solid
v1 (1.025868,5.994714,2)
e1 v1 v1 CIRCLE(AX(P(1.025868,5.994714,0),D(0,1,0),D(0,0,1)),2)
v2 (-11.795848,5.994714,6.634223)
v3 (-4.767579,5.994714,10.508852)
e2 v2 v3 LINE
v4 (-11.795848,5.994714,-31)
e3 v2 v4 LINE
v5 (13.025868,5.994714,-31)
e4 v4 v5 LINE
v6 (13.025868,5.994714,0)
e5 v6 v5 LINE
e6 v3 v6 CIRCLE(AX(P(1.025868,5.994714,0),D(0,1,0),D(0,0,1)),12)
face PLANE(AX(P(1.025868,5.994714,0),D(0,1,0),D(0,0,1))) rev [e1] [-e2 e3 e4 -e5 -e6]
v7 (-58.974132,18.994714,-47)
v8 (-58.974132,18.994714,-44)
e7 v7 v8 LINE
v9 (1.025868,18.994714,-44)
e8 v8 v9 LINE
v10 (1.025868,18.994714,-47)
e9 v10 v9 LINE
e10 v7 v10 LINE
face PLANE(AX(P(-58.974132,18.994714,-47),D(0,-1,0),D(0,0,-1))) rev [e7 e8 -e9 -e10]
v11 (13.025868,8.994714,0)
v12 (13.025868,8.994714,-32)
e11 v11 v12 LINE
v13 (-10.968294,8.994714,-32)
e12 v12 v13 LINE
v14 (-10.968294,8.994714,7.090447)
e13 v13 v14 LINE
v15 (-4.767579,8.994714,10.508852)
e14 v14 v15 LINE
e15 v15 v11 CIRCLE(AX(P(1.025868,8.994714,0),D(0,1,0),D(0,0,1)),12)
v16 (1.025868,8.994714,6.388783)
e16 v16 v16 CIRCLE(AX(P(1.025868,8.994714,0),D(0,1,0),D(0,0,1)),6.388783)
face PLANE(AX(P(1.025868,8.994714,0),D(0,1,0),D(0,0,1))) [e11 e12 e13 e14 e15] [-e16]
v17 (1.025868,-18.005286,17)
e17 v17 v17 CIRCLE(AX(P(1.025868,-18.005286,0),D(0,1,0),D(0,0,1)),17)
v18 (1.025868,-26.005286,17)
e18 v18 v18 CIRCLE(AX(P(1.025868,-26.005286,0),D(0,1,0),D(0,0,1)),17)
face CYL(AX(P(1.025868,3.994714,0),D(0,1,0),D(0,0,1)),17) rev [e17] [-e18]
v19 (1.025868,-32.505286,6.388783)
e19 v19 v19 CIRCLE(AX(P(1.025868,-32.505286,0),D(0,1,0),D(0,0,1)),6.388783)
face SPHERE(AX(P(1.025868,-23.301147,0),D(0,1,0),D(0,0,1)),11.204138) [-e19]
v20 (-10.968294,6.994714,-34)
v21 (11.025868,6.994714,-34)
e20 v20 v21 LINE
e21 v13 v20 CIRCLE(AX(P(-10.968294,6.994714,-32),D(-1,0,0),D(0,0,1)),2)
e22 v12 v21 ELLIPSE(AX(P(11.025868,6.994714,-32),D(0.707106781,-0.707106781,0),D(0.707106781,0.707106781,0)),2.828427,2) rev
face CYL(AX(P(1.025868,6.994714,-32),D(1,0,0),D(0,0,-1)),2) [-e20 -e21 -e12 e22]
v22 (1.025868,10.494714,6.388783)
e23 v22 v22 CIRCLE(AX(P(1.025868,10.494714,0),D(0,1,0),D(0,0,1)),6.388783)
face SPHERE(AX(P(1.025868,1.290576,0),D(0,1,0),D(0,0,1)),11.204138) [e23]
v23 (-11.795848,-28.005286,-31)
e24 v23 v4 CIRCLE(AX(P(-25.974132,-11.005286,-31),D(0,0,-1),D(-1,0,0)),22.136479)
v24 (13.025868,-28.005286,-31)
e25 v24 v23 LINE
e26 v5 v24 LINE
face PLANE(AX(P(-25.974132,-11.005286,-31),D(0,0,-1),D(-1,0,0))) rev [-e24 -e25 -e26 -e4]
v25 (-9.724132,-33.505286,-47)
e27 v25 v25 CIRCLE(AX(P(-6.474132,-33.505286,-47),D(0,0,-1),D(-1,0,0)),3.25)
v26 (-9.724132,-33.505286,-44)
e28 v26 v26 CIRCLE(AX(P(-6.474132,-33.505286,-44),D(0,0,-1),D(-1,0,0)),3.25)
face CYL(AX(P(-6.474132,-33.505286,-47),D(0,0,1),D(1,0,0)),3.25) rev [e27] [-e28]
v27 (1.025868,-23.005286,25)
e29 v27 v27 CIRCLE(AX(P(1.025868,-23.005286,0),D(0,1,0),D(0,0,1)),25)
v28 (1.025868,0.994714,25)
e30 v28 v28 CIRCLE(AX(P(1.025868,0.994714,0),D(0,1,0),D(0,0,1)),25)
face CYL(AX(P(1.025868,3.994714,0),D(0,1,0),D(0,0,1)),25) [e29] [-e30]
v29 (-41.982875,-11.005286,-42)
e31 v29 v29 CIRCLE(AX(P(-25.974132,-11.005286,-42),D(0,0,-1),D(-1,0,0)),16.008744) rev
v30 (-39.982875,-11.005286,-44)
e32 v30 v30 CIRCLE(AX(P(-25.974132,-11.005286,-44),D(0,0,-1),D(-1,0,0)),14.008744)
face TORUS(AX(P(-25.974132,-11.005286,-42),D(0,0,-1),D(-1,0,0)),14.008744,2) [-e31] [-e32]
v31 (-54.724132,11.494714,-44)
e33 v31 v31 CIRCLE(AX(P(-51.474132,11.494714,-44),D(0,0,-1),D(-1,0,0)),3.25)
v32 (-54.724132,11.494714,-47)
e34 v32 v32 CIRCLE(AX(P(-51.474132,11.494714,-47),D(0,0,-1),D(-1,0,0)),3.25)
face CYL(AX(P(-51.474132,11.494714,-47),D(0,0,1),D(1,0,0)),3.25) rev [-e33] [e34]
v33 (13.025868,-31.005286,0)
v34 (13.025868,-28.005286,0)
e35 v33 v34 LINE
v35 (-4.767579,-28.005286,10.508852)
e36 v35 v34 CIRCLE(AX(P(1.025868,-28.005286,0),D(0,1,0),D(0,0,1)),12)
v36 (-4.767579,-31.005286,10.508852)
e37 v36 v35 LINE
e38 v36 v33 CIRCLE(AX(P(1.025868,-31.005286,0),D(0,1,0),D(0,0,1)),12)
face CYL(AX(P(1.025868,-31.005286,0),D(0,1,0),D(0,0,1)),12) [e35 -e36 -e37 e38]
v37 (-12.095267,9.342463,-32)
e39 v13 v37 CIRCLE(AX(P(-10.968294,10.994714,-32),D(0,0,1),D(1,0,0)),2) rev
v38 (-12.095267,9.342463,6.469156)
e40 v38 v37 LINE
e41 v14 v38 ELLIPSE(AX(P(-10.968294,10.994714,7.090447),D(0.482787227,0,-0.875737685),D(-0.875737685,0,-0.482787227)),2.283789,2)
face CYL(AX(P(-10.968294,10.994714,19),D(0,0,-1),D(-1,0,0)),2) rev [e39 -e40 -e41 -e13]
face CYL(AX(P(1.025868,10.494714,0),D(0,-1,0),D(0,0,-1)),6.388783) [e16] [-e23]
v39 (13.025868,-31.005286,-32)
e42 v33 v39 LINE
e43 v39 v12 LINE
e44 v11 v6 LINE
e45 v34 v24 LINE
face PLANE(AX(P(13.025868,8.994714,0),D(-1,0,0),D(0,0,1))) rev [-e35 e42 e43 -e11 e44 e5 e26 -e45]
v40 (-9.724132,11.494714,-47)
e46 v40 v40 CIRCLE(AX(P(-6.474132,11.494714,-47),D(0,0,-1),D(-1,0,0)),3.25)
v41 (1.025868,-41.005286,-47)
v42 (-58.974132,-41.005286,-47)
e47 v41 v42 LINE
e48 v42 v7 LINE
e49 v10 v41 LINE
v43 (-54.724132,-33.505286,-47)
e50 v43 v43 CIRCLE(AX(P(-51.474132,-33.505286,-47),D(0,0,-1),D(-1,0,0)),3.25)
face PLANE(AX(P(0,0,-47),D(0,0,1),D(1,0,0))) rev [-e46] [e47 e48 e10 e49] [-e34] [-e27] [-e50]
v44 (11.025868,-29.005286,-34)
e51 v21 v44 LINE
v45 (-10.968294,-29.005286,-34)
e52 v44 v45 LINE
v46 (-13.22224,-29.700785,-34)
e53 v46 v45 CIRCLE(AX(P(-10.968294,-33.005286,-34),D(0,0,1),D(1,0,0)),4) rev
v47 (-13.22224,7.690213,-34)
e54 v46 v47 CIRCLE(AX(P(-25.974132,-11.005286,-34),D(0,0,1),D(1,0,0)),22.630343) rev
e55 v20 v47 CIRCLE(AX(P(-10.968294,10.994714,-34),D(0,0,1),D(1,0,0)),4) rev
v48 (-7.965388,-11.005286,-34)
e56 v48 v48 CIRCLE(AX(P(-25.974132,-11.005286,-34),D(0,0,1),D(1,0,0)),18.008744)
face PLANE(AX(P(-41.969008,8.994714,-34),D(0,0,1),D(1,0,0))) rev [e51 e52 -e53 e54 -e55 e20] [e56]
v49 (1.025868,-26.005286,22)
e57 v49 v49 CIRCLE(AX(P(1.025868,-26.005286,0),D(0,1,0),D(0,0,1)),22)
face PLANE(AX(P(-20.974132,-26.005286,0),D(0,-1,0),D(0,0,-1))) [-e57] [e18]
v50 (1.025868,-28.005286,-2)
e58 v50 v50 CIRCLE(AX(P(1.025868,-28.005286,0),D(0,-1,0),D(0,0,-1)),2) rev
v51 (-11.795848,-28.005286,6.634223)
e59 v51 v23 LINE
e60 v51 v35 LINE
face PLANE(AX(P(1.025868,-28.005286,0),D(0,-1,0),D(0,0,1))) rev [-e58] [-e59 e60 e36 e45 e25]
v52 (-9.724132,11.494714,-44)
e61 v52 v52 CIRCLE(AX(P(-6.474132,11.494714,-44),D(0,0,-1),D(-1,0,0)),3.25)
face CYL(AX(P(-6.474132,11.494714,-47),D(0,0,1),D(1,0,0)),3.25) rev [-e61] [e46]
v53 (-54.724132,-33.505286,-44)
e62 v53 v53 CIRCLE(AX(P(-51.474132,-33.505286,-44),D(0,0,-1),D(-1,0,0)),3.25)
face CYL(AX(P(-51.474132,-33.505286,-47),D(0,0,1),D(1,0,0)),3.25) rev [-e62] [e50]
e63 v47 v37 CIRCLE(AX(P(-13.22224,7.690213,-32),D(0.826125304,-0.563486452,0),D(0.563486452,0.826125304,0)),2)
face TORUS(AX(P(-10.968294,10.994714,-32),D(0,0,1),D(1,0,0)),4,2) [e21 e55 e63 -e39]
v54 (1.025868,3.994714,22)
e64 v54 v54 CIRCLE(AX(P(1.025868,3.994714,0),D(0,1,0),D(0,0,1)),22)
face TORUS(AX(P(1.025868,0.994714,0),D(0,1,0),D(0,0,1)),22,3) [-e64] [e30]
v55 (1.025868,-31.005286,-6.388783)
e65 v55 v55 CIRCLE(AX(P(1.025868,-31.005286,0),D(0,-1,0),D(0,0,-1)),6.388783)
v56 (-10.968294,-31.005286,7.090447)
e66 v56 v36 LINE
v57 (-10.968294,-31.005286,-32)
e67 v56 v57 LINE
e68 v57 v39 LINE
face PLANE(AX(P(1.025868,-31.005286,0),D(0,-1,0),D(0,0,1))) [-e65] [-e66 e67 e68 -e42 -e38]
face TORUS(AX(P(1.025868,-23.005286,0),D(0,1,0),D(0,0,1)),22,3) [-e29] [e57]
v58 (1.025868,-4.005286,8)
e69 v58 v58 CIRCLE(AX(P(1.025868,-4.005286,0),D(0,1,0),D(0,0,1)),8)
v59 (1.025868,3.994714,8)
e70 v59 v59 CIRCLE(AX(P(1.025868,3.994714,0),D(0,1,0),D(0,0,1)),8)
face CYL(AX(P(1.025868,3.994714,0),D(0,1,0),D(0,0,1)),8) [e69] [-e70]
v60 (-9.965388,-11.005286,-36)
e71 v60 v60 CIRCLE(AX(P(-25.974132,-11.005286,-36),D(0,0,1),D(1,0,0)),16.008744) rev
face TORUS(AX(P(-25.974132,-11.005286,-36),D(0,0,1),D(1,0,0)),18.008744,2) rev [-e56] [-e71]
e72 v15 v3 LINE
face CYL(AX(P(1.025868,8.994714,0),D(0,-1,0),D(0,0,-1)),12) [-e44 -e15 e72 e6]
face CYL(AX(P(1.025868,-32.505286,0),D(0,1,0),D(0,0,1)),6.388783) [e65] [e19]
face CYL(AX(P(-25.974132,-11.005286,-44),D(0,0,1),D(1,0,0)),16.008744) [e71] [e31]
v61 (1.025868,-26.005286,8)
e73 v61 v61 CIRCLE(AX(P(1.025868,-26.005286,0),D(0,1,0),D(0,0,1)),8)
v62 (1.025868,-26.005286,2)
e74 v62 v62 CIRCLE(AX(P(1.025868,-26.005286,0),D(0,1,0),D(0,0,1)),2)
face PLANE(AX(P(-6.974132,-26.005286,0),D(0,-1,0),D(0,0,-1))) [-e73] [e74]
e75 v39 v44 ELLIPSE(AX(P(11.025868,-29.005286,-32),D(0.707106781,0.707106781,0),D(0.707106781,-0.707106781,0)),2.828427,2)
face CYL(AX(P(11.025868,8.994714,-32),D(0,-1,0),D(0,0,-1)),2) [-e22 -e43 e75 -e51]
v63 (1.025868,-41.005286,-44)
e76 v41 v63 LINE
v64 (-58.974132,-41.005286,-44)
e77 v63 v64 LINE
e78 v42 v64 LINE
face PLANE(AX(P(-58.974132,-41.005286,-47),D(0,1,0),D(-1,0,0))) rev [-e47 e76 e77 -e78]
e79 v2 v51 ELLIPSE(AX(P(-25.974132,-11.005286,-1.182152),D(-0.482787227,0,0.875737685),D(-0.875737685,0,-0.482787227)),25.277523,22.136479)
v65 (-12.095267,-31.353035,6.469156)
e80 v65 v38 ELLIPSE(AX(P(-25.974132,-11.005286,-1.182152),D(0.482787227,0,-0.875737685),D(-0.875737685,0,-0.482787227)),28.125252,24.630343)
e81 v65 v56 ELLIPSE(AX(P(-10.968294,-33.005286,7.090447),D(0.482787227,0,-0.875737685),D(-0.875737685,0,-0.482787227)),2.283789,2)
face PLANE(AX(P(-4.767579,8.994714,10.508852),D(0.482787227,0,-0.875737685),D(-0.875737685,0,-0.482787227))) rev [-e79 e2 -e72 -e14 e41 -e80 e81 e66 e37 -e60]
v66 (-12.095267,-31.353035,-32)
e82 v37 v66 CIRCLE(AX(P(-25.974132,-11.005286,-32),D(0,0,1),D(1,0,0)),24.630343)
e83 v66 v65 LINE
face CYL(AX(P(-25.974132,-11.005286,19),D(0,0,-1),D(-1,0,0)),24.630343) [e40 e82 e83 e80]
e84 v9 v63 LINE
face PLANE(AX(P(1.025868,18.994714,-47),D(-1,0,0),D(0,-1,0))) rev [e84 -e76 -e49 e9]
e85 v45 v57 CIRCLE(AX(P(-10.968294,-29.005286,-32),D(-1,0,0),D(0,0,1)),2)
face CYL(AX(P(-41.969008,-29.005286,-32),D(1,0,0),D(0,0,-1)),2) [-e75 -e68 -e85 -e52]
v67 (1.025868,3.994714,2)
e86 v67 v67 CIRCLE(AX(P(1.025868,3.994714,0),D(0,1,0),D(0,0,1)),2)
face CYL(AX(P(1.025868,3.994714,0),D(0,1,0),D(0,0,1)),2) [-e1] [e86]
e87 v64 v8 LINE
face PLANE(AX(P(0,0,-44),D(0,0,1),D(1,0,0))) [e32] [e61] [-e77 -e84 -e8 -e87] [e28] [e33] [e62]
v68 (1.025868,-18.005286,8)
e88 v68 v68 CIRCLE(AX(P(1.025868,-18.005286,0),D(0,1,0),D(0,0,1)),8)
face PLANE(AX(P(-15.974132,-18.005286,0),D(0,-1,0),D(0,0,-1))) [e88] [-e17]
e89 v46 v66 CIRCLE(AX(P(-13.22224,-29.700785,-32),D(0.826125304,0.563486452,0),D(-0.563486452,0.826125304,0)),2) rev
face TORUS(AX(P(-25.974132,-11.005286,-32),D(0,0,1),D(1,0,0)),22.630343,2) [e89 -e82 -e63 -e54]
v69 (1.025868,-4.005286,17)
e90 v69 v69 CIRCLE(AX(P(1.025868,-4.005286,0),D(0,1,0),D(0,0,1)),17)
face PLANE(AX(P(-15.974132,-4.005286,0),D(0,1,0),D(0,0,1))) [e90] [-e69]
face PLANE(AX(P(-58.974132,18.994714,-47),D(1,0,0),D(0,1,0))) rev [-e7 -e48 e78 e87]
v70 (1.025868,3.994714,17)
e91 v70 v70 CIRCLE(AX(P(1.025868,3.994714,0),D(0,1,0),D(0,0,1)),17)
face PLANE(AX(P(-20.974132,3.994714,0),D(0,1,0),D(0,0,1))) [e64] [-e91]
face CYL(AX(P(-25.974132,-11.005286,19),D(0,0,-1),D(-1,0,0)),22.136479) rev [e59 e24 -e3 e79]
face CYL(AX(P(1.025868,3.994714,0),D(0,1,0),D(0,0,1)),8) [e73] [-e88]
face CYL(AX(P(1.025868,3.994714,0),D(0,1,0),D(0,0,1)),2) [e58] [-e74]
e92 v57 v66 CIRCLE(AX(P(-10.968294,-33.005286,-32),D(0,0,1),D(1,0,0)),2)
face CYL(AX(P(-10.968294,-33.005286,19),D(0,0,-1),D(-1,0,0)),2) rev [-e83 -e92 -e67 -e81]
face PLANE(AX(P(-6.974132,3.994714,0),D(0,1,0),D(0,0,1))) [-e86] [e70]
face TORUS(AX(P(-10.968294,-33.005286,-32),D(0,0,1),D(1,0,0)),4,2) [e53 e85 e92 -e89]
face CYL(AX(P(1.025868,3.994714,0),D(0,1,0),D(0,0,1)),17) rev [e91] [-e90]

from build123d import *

# Parameters (mm, degrees)
EXTRUDE_1_DEPTH          = 3
EXTRUDE_2_DEPTH          = 53
CUT_EXTRUDE_1_DEPTH      = 13
CUT_EXTRUDE_1_DEPTH_BACK = 3
CUT_EXTRUDE_2_DEPTH      = 13
CUT_EXTRUDE_2_DEPTH_BACK = 3
CUT_EXTRUDE_3_DEPTH      = 43
CUT_EXTRUDE_4_DEPTH      = 53
EXTRUDE_3_DEPTH          = 3
SKETCH_9_R               = 16.008743555
EXTRUDE_4_DEPTH          = 10
FILLET_1_R               = 2
SKETCH_11_W              = 60
SKETCH_11_H              = 60
SKETCH_11_R              = 3.25
EXTRUDE_6_DEPTH          = 3
SKETCH_12_R              = 6.388783443
EXTRUDE_7_DEPTH          = 1.5


# Read off the part's stored shape, not the designer's step: 圆顶1
with BuildPart() as part:
    # 草图1 → 旋转1 (revolve)
    with BuildSketch(Plane.XY, mode=Mode.PRIVATE) as revolve_1_sk:
        with BuildLine():
            Line((-15.974131822, -4.005285962), (-6.974131822, -4.005285962))
            Line((-6.974131822, -4.005285962), (-6.974131822, 3.994714038))
            Line((-6.974131822, 3.994714038), (-0.974131822, 3.994714038))
            Line((-0.974131822, 3.994714038), (-0.974131822, 5.994714038))
            Line((-0.974131822, 5.994714038), (1.025868178, 5.994714038))
            Line((1.025868178, 5.994714038), (1.025868178, 3.994714038))
            Line((1.025868178, 3.994714038), (1.025868178, -26.005285962))
            Line((1.025868178, -26.005285962), (1.025868178, -28.005285962))
            Line((1.025868178, -28.005285962), (-0.974131822, -28.005285962))
            Line((-0.974131822, -28.005285962), (-0.974131822, -26.005285962))
            Line((-0.974131822, -26.005285962), (-6.974131822, -26.005285962))
            Line((-6.974131822, -26.005285962), (-6.974131822, -18.005285962))
            Line((-6.974131822, -18.005285962), (-15.974131822, -18.005285962))
            Line((-15.974131822, -18.005285962), (-15.974131822, -26.005285962))
            Line((-15.974131822, -26.005285962), (-20.974131822, -26.005285962))
            ThreePointArc((-20.974131822, -26.005285962), (-23.095452166, -25.126606305), (-23.974131822, -23.005285962))
            Line((-23.974131822, -23.005285962), (-23.974131822, 0.994714038))
            ThreePointArc((-23.974131822, 0.994714038), (-23.095452166, 3.116034382), (-20.974131822, 3.994714038))
            Line((-20.974131822, 3.994714038), (-15.974131822, 3.994714038))
            Line((-15.974131822, 3.994714038), (-15.974131822, -4.005285962))
        make_face()
    revolve(revolve_1_sk.sketch.rotate(Axis((1.025868178, 3.994714038, 0), (0, -1, 0)), 270), axis=Axis((1.025868178, 3.994714038, 0), (0, -1, 0)))

    # 草图2 → 凸台-拉伸1 (add)
    with BuildSketch(Plane(origin=(0, 5.994714038, 0), x_dir=(1, 0, 0), z_dir=(0, 1, 0))):
        with BuildLine():
            Line((-41.969007605, 34), (-41.969007605, 10))
            Line((-41.969007605, 10), (-4.767578546, -10.508852224))
            ThreePointArc((-4.767578546, -10.508852224), (7.128270955, -10.332506005), (13.025868178, 0))
            Line((13.025868178, 0), (13.025868178, 34))
            Line((13.025868178, 34), (-41.969007605, 34))
        make_face()
    extrude_1 = extrude(amount=EXTRUDE_1_DEPTH)

    # 镜向1: 凸台-拉伸1 across plane
    add(extrude_1.mirror(Plane(origin=(0, -11.005285962, 0), x_dir=(0, 0, 1), z_dir=(0, -1, 0))))

    # 草图3 → 凸台-拉伸2 (add)
    with BuildSketch(Plane(origin=(0, 0, -34), x_dir=(-1, 0, 0), z_dir=(0, 0, -1))):
        with BuildLine():
            Line((11.478918221, 8.994714038), (16.486048812, 8.994714038))
            ThreePointArc((16.486048812, 8.994714038), (48.110611199, -11.005285962), (16.486048812, -31.005285962))
            Line((16.486048812, -31.005285962), (11.478918221, -31.005285962))
            ThreePointArc((11.478918221, -31.005285962), (50.67456132, -11.005285962), (11.478918221, 8.994714038))
        make_face()
    extrude(amount=-EXTRUDE_2_DEPTH)

    # 草图4 → 切除-拉伸1 (cut, two sides: drawn at the far end of the back side and taken through both)
    with BuildSketch(Plane(origin=(0, 8.994714038, 0), x_dir=(1, 0, 0), z_dir=(0, 1, 0)).offset(-CUT_EXTRUDE_1_DEPTH_BACK)):
        Polygon((-11.478918221, -19), (-11.478918221, -6.808943992), (-50.67456132, 14.799302585), (-50.67456132, -19), align=None)
    extrude(amount=CUT_EXTRUDE_1_DEPTH + CUT_EXTRUDE_1_DEPTH_BACK, mode=Mode.SUBTRACT)

    # 草图5 → 切除-拉伸2 (cut, two sides: drawn at the far end of the back side and taken through both)
    with BuildSketch(Plane.XZ.offset(31.005285962).offset(-CUT_EXTRUDE_2_DEPTH_BACK)):
        Polygon((-50.67456132, -14.799302585), (-11.478918221, 6.808943992), (-11.478918221, 19), (-50.67456132, 19), align=None)
    extrude(amount=CUT_EXTRUDE_2_DEPTH + CUT_EXTRUDE_2_DEPTH_BACK, mode=Mode.SUBTRACT)

    # 草图6 → 切除-拉伸3 (cut)
    with BuildSketch(Plane.XZ.offset(31.005285962)):
        Polygon((-25.974131822, -1.182152082), (-62.642319146, -21.397032375), (-62.642319146, 19.111249926), (-25.974131822, 19.111249926), align=None)
    extrude(amount=-CUT_EXTRUDE_3_DEPTH, mode=Mode.SUBTRACT)

    # 草图7 → 切除-拉伸4 (cut)
    with BuildSketch(Plane(origin=(0, 0, -34), x_dir=(-1, 0, 0), z_dir=(0, 0, -1))):
        with BuildLine():
            Line((11.795848456, 5.994714038), (25.974131822, 5.994714038))
            Line((25.974131822, 5.994714038), (25.974131822, 8.994714038))
            Line((25.974131822, 8.994714038), (16.486048812, 8.994714038))
            ThreePointArc((16.486048812, 8.994714038), (14.046255885, 7.642756693), (11.795848456, 5.994714038))
        make_face()
        with BuildLine():
            Line((25.974131822, 8.994714038), (25.974131822, 5.994714038))
            Line((25.974131822, 5.994714038), (40.152415189, 5.994714038))
            ThreePointArc((40.152415189, 5.994714038), (37.902007759, 7.642756693), (35.462214833, 8.994714038))
            Line((35.462214833, 8.994714038), (25.974131822, 8.994714038))
        make_face()
        with BuildLine():
            Line((25.974131822, 11.131193415), (25.974131822, 8.994714038))
            Line((25.974131822, 8.994714038), (35.462214833, 8.994714038))
            ThreePointArc((35.462214833, 8.994714038), (30.836956705, 10.590469486), (25.974131822, 11.131193415))
        make_face()
        with BuildLine():
            Line((16.486048812, 8.994714038), (25.974131822, 8.994714038))
            Line((25.974131822, 8.994714038), (25.974131822, 11.131193415))
            ThreePointArc((25.974131822, 11.131193415), (21.11130694, 10.590469486), (16.486048812, 8.994714038))
        make_face()
        with BuildLine():
            Line((25.974131822, 19.253333442), (25.974131822, 13.695143536))
            ThreePointArc((25.974131822, 13.695143536), (33.593273093, 12.490669087), (40.469345424, 8.994714038))
            Line((40.469345424, 8.994714038), (41.969007605, 8.994714038))
            Line((41.969007605, 8.994714038), (41.969007605, 7.816912795))
            ThreePointArc((41.969007605, 7.816912795), (50.67456132, -11.005285962), (41.969007605, -29.827484719))
            Line((41.969007605, -29.827484719), (41.969007605, -31.005285962))
            Line((41.969007605, -31.005285962), (40.469345424, -31.005285962))
            ThreePointArc((40.469345424, -31.005285962), (33.593273093, -34.501241011), (25.974131822, -35.705715459))
            Line((25.974131822, -35.705715459), (25.974131822, -41.263905366))
            ThreePointArc((25.974131822, -41.263905366), (47.370206792, -32.401360932), (56.232751226, -11.005285962))
            ThreePointArc((56.232751226, -11.005285962), (47.370206792, 10.390789008), (25.974131822, 19.253333442))
        make_face()
        with BuildLine():
            Line((35.462214833, -31.005285962), (25.974131822, -31.005285962))
            Line((25.974131822, -31.005285962), (25.974131822, -33.141765339))
            ThreePointArc((25.974131822, -33.141765339), (30.836956705, -32.60104141), (35.462214833, -31.005285962))
        make_face()
        with BuildLine():
            Line((25.974131822, -31.005285962), (25.974131822, -28.005285962))
            Line((25.974131822, -28.005285962), (11.795848456, -28.005285962))
            ThreePointArc((11.795848456, -28.005285962), (14.046255885, -29.653328616), (16.486048812, -31.005285962))
            Line((16.486048812, -31.005285962), (25.974131822, -31.005285962))
        make_face()
        with BuildLine():
            Line((25.974131822, -33.141765339), (25.974131822, -31.005285962))
            Line((25.974131822, -31.005285962), (16.486048812, -31.005285962))
            ThreePointArc((16.486048812, -31.005285962), (21.11130694, -32.60104141), (25.974131822, -33.141765339))
        make_face()
        with BuildLine():
            Line((40.152415189, -28.005285962), (25.974131822, -28.005285962))
            Line((25.974131822, -28.005285962), (25.974131822, -31.005285962))
            Line((25.974131822, -31.005285962), (35.462214833, -31.005285962))
            ThreePointArc((35.462214833, -31.005285962), (37.902007759, -29.653328616), (40.152415189, -28.005285962))
        make_face()
        with BuildLine():
            Line((25.974131822, 13.695143536), (25.974131822, 13.625056772))
            ThreePointArc((25.974131822, 13.625056772), (43.390414192, 6.410996408), (50.604474556, -11.005285962))
            ThreePointArc((50.604474556, -11.005285962), (43.390414192, -28.421568332), (25.974131822, -35.635628696))
            Line((25.974131822, -35.635628696), (25.974131822, -35.705715459))
            ThreePointArc((25.974131822, -35.705715459), (33.593273093, -34.501241011), (40.469345424, -31.005285962))
            Line((40.469345424, -31.005285962), (41.969007605, -31.005285962))
            Line((41.969007605, -31.005285962), (41.969007605, -29.827484719))
            ThreePointArc((41.969007605, -29.827484719), (50.67456132, -11.005285962), (41.969007605, 7.816912795))
            Line((41.969007605, 7.816912795), (41.969007605, 8.994714038))
            Line((41.969007605, 8.994714038), (40.469345424, 8.994714038))
            ThreePointArc((40.469345424, 8.994714038), (33.593273093, 12.490669087), (25.974131822, 13.695143536))
        make_face()
        with BuildLine():
            ThreePointArc((25.974131822, -35.705715459), (18.354990551, -34.501241011), (11.478918221, -31.005285962))
            Line((11.478918221, -31.005285962), (3.267655913, -31.005285962))
            ThreePointArc((3.267655913, -31.005285962), (13.515968632, -38.58024232), (25.974131822, -41.263905366))
            Line((25.974131822, -41.263905366), (25.974131822, -35.705715459))
        make_face()
        with BuildLine():
            Line((3.267655913, 8.994714038), (11.478918221, 8.994714038))
            ThreePointArc((11.478918221, 8.994714038), (18.354990551, 12.490669087), (25.974131822, 13.695143536))
            Line((25.974131822, 13.695143536), (25.974131822, 19.253333442))
            ThreePointArc((25.974131822, 19.253333442), (13.515968632, 16.569670396), (3.267655913, 8.994714038))
        make_face()
        with BuildLine():
            Line((11.478918221, 8.994714038), (11.598674153, 8.994714038))
            ThreePointArc((11.598674153, 8.994714038), (18.422743588, 12.438909886), (25.974131822, 13.625056772))
            Line((25.974131822, 13.625056772), (25.974131822, 13.695143536))
            ThreePointArc((25.974131822, 13.695143536), (18.354990551, 12.490669087), (11.478918221, 8.994714038))
        make_face()
        with BuildLine():
            ThreePointArc((25.974131822, -35.635628696), (18.422743588, -34.449481809), (11.598674153, -31.005285962))
            Line((11.598674153, -31.005285962), (11.478918221, -31.005285962))
            ThreePointArc((11.478918221, -31.005285962), (18.354990551, -34.501241011), (25.974131822, -35.705715459))
            Line((25.974131822, -35.705715459), (25.974131822, -35.635628696))
        make_face()
    extrude(amount=-CUT_EXTRUDE_4_DEPTH, mode=Mode.SUBTRACT)

    # 草图8 → 凸台-拉伸3 (add)
    with BuildSketch(Plane(origin=(0, 0, -34), x_dir=(-1, 0, 0), z_dir=(0, 0, -1))):
        with BuildLine():
            Line((-13.025868178, 5.994714038), (11.795848456, 5.994714038))
            ThreePointArc((11.795848456, 5.994714038), (48.110611199, -11.005285962), (11.795848456, -28.005285962))
            Line((11.795848456, -28.005285962), (-13.025868178, -28.005285962))
            Line((-13.025868178, -28.005285962), (-13.025868178, 5.994714038))
        make_face()
    extrude(amount=-EXTRUDE_3_DEPTH)

    # 草图9 → 凸台-拉伸4 (add)
    with BuildSketch(Plane(origin=(0, 0, -34), x_dir=(-1, 0, 0), z_dir=(0, 0, -1))):
        with Locations(Location((25.974131822, -11.005285962, 0), (0, 0, 180))):
            Circle(SKETCH_9_R)
    extrude(amount=EXTRUDE_4_DEPTH)

    # 圆角1
    fillet_1_edges = [part.edges().sort_by_distance(p)[0] for p in [
        (-11.598674153, -31.005285962, -13.628538251),
        (-50.604474556, -11.005285962, -34),
        (-11.598674153, 8.994714038, -13.628538251),
        (-41.982875377, -11.005285962, -34),
        (-41.982875377, -11.005285962, -44),
        (13.025868178, -11.005285962, -34),
        (0.713597012, 8.994714038, -34),
        (0.713597012, -31.005285962, -34),
    ]]
    fillet(fillet_1_edges, radius=FILLET_1_R)

    # 草图11 → 凸台-拉伸6 (add)
    with BuildSketch(Plane(origin=(0, 0, -44), x_dir=(-1, 0, 0), z_dir=(0, 0, -1))):
        with Locations((28.974131822, -11.005285962)):
            Rectangle(SKETCH_11_W, SKETCH_11_H)
        with Locations((51.474131822, 11.494714038)):
            Circle(SKETCH_11_R, mode=Mode.SUBTRACT)
        with Locations((51.474131822, -33.505285962)):
            Circle(SKETCH_11_R, mode=Mode.SUBTRACT)
        with Locations((6.474131822, -33.505285962)):
            Circle(SKETCH_11_R, mode=Mode.SUBTRACT)
        with Locations((6.474131822, 11.494714038)):
            Circle(SKETCH_11_R, mode=Mode.SUBTRACT)
    extrude(amount=EXTRUDE_6_DEPTH)

    # 草图12 → 凸台-拉伸7 (add)
    with BuildSketch(Plane(origin=(0, 8.994714038, 0), x_dir=(1, 0, 0), z_dir=(0, 1, 0))):
        with Locations(Location((1.025868178, 0, 0), (0, 0, 270))):
            Circle(SKETCH_12_R)
    extrude_7 = extrude(amount=EXTRUDE_7_DEPTH)

    # 圆顶1 outline → 圆顶1 (revolve)
    with BuildSketch(Plane(origin=(1.025868178, 0, 0), x_dir=(1, 0, 0), z_dir=(0, 0, 1))):
        with BuildLine():
            Line((0, 10.494714038), (6.388783452, 10.494714032))
            ThreePointArc((6.388783452, 10.494714032), (3.347258356, 11.983029933), (0, 12.494714038))
            Line((0, 12.494714038), (0, 10.494714038))
        make_face()
    dome_1 = revolve(axis=Axis((1.025868178, 0, 0), (0, 1, 0)))

    # 镜向2: 凸台-拉伸7, 圆顶1 across plane
    add(extrude_7.mirror(Plane(origin=(0, -11.005285962, 0), x_dir=(0, 0, 1), z_dir=(0, -1, 0))))
    add(dome_1.mirror(Plane(origin=(0, -11.005285962, 0), x_dir=(0, 0, 1), z_dir=(0, -1, 0))))


solid = part.part
